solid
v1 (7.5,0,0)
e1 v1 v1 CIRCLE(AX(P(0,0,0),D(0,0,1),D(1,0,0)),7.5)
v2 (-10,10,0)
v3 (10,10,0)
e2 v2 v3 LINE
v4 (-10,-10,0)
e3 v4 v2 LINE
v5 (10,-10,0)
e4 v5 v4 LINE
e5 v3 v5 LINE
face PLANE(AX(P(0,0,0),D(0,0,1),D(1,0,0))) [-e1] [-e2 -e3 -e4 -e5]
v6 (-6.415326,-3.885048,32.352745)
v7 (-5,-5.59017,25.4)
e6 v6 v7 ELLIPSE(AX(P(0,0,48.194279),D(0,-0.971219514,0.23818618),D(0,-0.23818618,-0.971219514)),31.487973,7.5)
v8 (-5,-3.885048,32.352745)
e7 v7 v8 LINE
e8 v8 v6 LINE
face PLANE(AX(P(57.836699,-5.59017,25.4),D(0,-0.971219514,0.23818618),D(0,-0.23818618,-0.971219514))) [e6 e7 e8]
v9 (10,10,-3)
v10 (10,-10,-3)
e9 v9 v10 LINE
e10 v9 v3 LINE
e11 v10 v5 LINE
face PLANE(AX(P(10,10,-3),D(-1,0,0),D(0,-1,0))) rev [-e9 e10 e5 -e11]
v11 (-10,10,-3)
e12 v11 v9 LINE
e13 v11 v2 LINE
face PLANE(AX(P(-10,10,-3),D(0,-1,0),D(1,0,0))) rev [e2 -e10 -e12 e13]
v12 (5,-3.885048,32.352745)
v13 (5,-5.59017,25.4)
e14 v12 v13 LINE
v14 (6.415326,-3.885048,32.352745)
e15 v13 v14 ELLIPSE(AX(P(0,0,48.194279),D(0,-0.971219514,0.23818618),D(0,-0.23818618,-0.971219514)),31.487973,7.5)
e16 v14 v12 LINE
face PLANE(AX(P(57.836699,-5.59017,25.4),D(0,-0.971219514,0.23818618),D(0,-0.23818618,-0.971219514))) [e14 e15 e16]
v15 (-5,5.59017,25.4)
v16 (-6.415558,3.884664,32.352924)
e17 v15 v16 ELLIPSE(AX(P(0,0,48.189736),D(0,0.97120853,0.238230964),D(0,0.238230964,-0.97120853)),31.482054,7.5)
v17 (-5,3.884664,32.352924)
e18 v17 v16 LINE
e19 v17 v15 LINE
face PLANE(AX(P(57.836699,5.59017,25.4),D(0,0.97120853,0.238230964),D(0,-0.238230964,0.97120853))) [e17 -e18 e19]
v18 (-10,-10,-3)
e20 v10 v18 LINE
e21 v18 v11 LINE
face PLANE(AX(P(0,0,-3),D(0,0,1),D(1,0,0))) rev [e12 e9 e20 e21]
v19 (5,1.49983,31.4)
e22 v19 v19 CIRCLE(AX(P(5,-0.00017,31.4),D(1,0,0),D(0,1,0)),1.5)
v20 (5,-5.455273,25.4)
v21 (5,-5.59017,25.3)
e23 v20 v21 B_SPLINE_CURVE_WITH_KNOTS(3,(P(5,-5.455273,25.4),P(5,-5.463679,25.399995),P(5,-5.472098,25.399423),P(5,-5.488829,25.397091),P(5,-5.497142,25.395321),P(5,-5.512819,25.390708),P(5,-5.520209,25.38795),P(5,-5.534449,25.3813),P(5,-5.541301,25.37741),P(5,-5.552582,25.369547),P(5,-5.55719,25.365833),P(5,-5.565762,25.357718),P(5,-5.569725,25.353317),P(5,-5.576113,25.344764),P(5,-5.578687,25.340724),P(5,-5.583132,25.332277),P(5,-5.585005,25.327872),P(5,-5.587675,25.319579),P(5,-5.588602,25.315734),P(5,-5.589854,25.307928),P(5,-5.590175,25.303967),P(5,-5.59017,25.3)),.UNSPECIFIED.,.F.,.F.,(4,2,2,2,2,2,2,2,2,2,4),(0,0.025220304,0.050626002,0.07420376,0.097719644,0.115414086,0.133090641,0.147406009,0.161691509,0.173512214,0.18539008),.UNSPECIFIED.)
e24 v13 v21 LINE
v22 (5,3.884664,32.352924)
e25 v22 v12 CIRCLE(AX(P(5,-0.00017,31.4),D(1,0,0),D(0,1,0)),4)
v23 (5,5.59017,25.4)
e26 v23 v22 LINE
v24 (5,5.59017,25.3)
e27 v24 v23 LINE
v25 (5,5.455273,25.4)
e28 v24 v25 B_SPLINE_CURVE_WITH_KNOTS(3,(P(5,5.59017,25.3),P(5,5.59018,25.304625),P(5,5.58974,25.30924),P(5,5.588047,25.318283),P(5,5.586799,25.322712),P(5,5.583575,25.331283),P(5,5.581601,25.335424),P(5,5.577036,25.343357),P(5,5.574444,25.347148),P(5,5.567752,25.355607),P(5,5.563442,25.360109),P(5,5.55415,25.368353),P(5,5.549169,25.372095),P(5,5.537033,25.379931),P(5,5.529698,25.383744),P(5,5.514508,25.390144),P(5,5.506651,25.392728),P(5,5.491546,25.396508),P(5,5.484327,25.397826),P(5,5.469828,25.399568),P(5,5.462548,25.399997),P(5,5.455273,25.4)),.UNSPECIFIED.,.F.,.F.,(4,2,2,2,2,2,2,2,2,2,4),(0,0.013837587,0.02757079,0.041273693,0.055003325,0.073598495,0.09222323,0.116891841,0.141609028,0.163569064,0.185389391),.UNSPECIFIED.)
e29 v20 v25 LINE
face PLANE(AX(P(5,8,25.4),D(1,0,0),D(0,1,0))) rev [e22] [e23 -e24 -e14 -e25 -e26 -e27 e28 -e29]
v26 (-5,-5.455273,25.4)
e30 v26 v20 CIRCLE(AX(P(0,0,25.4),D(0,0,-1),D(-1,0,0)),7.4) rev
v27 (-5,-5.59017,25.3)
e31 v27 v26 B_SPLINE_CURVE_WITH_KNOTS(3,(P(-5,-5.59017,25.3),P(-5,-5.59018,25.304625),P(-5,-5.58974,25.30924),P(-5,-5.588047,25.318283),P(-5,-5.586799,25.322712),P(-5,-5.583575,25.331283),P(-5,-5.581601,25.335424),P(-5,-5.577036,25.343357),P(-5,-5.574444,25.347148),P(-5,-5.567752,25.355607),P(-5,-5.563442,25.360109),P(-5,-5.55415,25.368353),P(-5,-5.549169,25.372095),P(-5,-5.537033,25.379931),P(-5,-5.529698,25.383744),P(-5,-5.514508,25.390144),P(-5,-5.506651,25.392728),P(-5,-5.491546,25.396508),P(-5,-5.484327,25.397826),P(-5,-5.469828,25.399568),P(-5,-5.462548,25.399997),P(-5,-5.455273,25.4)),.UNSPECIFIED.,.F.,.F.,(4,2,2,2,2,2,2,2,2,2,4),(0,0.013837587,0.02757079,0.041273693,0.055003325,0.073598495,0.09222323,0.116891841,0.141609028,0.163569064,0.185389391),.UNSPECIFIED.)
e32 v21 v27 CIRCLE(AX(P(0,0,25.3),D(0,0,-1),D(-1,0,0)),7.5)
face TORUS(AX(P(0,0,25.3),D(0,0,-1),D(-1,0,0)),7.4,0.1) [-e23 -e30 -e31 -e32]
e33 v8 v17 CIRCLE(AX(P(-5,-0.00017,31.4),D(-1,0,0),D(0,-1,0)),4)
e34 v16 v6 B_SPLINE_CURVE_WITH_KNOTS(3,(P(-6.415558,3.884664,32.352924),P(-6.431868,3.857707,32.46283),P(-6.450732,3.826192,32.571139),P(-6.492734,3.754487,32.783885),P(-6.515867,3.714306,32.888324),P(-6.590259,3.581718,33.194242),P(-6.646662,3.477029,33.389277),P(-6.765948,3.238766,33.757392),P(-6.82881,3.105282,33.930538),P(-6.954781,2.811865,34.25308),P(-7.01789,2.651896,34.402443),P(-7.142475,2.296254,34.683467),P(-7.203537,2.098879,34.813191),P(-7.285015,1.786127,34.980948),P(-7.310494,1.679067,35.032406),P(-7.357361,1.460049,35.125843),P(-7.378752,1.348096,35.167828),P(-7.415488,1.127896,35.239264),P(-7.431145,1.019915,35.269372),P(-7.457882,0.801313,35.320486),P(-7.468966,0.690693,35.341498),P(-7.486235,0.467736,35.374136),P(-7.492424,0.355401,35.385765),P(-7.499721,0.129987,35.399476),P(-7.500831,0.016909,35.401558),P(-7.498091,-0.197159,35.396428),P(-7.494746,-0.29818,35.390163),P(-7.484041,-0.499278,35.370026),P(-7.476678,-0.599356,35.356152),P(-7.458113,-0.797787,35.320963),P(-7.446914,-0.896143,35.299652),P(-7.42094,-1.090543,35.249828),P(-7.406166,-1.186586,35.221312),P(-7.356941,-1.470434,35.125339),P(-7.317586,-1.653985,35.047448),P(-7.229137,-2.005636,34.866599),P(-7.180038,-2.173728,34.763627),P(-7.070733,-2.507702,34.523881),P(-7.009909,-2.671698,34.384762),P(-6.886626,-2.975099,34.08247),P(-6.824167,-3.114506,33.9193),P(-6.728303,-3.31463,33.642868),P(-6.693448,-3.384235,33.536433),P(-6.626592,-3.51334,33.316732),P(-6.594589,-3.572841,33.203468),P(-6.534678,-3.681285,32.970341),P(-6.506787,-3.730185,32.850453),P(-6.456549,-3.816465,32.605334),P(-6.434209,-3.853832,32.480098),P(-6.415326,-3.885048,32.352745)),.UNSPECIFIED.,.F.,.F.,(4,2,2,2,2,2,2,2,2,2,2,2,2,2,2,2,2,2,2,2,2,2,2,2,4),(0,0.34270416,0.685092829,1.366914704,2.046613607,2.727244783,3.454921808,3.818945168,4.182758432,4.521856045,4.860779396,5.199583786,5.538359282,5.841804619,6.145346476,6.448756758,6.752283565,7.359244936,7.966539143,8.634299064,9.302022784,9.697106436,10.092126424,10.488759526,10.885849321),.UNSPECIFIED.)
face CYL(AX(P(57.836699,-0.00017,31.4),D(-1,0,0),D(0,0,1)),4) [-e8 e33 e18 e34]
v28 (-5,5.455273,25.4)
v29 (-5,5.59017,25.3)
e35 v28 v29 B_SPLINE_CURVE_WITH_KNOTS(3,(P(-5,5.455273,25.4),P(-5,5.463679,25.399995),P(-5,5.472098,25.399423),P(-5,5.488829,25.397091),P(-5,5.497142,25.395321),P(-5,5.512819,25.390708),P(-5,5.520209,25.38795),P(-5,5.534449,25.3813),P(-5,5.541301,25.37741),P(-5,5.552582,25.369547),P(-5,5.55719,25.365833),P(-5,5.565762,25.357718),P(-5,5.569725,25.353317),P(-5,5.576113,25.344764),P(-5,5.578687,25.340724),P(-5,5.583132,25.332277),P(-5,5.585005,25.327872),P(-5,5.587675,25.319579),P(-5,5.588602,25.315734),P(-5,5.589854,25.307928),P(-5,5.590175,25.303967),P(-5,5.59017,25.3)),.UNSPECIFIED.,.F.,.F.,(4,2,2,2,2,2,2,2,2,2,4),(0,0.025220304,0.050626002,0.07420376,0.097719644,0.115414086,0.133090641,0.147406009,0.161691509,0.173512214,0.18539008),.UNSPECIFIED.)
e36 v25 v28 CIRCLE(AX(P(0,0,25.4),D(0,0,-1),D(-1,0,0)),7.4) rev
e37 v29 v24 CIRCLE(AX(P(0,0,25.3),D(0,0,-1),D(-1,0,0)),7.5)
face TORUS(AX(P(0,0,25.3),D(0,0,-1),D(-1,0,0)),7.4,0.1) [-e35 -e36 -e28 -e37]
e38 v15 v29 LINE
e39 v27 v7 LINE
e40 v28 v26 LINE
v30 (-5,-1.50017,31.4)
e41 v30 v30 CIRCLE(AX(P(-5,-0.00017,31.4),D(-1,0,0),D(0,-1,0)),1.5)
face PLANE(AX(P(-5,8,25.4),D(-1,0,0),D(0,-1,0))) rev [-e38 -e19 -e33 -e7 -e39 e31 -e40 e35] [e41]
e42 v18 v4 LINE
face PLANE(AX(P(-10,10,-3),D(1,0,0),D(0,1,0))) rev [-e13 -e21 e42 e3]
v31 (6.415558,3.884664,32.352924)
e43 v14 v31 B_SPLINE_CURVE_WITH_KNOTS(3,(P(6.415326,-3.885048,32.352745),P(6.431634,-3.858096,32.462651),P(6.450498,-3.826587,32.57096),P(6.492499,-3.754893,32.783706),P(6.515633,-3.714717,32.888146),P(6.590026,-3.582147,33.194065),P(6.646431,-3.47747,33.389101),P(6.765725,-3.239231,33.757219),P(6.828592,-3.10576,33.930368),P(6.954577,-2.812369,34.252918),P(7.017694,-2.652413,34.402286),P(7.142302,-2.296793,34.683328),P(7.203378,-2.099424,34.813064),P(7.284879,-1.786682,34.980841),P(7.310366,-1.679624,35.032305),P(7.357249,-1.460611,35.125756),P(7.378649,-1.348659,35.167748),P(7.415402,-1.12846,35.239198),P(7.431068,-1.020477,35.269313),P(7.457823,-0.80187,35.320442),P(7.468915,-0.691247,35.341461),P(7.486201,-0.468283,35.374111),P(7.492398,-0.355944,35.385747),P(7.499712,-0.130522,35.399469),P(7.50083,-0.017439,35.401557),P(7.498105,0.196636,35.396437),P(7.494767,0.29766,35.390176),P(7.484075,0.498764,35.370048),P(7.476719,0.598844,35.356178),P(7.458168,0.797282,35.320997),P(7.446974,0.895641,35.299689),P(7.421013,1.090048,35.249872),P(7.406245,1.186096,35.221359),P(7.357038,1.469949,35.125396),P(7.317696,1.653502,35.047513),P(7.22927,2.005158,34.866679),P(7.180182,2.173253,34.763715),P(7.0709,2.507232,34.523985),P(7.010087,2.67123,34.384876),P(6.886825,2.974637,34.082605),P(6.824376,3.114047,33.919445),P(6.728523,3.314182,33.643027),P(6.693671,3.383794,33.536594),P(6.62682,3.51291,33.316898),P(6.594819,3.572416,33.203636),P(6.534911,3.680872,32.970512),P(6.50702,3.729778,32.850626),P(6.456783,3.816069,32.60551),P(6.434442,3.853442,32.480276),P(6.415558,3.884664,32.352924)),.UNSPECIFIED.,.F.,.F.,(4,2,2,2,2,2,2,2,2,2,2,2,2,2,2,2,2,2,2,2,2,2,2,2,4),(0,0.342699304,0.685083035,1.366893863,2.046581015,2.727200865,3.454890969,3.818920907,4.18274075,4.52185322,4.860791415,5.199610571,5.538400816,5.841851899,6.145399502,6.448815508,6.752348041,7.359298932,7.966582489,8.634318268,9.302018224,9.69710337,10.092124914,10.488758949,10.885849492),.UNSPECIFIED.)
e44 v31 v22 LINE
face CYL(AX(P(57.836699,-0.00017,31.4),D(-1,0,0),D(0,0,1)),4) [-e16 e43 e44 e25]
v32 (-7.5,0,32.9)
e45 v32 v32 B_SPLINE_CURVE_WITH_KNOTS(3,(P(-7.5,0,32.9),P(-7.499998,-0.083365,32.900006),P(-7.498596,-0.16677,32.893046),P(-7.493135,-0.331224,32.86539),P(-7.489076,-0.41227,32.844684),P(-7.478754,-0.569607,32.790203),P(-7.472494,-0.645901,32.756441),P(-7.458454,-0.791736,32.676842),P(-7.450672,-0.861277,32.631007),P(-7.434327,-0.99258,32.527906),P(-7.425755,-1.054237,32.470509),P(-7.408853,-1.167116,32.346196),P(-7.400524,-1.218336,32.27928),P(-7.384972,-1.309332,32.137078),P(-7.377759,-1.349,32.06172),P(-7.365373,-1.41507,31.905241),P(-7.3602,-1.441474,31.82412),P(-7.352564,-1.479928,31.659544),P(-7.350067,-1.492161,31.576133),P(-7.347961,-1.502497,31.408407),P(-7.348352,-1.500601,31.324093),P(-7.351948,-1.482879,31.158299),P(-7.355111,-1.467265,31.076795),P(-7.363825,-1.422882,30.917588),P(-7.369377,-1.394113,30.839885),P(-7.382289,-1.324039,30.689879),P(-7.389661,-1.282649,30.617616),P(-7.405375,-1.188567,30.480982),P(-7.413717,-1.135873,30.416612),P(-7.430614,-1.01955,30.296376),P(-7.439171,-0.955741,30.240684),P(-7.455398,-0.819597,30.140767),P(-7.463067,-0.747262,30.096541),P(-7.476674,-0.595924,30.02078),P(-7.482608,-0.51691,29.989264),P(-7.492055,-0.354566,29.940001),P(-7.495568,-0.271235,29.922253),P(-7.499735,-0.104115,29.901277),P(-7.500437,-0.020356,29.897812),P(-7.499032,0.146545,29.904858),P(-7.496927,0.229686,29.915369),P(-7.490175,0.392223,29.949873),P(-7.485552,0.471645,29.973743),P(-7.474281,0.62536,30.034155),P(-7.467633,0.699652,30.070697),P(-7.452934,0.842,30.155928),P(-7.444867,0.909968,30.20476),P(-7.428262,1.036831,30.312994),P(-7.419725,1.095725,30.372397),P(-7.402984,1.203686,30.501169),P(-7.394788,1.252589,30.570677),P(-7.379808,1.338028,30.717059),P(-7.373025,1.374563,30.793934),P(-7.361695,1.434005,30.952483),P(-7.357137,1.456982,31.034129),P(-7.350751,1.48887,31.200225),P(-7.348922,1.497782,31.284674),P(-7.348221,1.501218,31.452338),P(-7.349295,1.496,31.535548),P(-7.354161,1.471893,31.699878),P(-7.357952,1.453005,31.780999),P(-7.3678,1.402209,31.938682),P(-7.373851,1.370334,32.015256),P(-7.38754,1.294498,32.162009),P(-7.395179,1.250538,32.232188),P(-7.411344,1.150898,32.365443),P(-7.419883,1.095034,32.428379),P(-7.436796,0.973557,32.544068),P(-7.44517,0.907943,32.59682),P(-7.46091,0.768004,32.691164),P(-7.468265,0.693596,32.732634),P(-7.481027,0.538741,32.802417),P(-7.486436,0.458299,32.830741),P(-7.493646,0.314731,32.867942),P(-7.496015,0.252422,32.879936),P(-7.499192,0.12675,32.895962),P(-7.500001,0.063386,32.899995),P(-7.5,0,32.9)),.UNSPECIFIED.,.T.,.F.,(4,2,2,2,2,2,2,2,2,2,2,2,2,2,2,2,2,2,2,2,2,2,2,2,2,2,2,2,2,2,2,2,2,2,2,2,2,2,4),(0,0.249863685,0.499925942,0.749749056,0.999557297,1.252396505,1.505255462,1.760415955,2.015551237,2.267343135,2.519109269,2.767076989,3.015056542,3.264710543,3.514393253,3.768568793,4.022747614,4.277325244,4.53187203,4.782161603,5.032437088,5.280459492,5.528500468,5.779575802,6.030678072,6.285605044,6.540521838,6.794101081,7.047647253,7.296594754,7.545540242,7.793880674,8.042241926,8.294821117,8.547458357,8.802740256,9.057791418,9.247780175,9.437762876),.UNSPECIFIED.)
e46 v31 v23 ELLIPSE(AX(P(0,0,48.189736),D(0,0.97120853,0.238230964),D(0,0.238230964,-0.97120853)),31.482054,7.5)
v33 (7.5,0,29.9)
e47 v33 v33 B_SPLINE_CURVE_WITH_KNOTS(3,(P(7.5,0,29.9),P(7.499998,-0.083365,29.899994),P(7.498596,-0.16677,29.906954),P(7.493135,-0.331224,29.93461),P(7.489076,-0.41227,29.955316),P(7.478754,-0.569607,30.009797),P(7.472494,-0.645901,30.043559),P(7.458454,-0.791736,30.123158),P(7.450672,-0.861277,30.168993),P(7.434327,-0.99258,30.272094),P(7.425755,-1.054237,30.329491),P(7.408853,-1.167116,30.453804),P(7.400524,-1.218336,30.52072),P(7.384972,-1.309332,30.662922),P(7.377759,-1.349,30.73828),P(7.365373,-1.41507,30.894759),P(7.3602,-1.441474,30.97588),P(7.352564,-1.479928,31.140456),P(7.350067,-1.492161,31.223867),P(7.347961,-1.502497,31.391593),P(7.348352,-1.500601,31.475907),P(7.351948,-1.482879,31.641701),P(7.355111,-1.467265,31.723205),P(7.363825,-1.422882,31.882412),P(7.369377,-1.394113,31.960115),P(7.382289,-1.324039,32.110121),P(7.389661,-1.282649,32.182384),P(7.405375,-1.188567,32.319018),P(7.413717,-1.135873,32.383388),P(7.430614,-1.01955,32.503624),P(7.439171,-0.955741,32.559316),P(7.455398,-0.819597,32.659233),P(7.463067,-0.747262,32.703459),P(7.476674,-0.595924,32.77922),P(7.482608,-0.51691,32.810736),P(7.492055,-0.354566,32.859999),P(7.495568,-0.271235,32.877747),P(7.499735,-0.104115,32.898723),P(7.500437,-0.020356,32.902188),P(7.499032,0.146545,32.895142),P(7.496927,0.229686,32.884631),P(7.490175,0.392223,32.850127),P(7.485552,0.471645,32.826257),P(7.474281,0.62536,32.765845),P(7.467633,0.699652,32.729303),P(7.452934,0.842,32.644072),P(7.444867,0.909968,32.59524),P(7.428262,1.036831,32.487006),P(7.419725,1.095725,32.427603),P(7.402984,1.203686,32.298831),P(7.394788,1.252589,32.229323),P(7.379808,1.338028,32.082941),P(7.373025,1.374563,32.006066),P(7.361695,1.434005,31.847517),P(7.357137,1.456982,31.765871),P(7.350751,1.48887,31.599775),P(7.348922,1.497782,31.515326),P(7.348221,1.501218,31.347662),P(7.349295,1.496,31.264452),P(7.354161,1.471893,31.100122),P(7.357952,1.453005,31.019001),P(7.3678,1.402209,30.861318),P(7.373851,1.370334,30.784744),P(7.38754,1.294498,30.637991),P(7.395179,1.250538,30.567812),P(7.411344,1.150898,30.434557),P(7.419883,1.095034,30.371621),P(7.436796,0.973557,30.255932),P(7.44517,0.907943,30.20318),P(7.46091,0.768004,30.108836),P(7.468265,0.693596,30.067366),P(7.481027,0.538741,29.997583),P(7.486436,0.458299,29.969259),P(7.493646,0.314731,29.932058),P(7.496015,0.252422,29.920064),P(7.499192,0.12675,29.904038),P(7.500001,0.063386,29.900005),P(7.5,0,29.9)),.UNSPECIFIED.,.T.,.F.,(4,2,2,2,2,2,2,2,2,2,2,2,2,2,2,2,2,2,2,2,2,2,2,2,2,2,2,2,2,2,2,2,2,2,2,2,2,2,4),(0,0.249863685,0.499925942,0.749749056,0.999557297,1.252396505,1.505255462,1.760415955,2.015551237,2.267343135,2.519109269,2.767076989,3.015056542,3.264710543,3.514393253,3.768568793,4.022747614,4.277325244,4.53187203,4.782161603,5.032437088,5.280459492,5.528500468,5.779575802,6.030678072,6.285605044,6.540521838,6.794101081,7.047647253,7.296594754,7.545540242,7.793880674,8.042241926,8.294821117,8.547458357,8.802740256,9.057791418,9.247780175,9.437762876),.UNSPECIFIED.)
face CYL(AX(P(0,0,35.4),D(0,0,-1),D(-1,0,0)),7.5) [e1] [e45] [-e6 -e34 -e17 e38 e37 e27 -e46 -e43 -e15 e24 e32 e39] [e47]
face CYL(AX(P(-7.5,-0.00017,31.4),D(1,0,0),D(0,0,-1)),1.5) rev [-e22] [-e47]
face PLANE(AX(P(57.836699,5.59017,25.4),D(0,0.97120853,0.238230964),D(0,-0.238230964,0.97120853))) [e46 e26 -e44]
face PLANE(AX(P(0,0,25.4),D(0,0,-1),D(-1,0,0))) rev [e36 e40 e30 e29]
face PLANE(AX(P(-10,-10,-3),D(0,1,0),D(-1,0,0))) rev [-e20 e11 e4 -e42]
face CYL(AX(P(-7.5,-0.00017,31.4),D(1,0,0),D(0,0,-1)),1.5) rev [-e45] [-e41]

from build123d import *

# Parameters (mm, degrees)
SKETCH1_R               = 7.5
BOSS_EXTRUDE1_DEPTH     = 35.4
SKETCH3_W               = 10
SKETCH3_H               = 16
CUT_EXTRUDE2_DEPTH      = 10
CUT_EXTRUDE3_DEPTH      = 37.954837302
CUT_EXTRUDE3_DEPTH_BACK = 37.954837302
CUT_EXTRUDE4_DEPTH      = 37.954837438
CUT_EXTRUDE4_DEPTH_BACK = 37.954837438
SKETCH5_R               = 1.5
FILLET1_R               = 0.1
SKETCH6_W               = 20
SKETCH6_H               = 20
BOSS_EXTRUDE2_DEPTH     = 3


with BuildPart() as part:
    # Sketch1 → Boss-Extrude1 (new body)
    with BuildSketch(Plane.XY):
        Circle(SKETCH1_R)
    extrude(amount=BOSS_EXTRUDE1_DEPTH)

    # Sketch3 → Cut-Extrude2 (cut)
    with BuildSketch(Plane.XY.offset(35.4)):
        Rectangle(SKETCH3_W, SKETCH3_H)
    extrude(amount=-CUT_EXTRUDE2_DEPTH, mode=Mode.SUBTRACT)

    # Sketch4 → Cut-Extrude3 (cut, two sides: drawn at the far end of the back side and taken through both)
    with BuildSketch(Plane(origin=(0, 0, 0), x_dir=(0, 0, -1), z_dir=(1, 0, 0)).offset(-CUT_EXTRUDE3_DEPTH_BACK)):
        with BuildLine():
            Line((-25.4, 76.496949074), (-25.4, 7.5))
            Line((-25.4, 7.5), (-25.4, 5.590169944))
            Line((-25.4, 5.590169944), (-32.352923855, 3.884664175))
            ThreePointArc((-32.352923855, 3.884664175), (-35.399999999, -0.000262165), (-32.352744721, -3.885047998))
            Line((-32.352744721, -3.885047998), (-25.4, -5.590169944))
            Line((-25.4, -5.590169944), (-25.4, -7.5))
            Line((-25.4, -7.5), (-25.4, -76.496949074))
            Line((-25.4, -76.496949074), (-163.393898147, -76.496949074))
            Line((-163.393898147, -76.496949074), (-163.393898147, 76.496949074))
            Line((-163.393898147, 76.496949074), (-25.4, 76.496949074))
        make_face()
    extrude(amount=CUT_EXTRUDE3_DEPTH + CUT_EXTRUDE3_DEPTH_BACK, mode=Mode.SUBTRACT)

    # Sketch5 → Cut-Extrude4 (cut, two sides: drawn at the far end of the back side and taken through both)
    with BuildSketch(Plane(origin=(0, 0, 0), x_dir=(0, 0, -1), z_dir=(1, 0, 0)).offset(-CUT_EXTRUDE4_DEPTH_BACK)):
        with Locations(Location((-31.4, -0.000169944, 0), (0, 0, 0.006491373))):
            Circle(SKETCH5_R)
    extrude(amount=CUT_EXTRUDE4_DEPTH + CUT_EXTRUDE4_DEPTH_BACK, mode=Mode.SUBTRACT)

    # Fillet1
    # the kernel refuses this fillet: 0.1 mm, written as the material it takes off along each edge
    with BuildSketch(Plane(origin=(0, 0, 25.4), x_dir=(0.6911452834399253, -0.7227158481580055, 0), z_dir=(0.7227158481580055, 0.6911452834399253, 0))) as fillet1_piece_1_section:
        with BuildLine():
            CenterArc((7.5 - FILLET1_R, FILLET1_R), FILLET1_R, 270, 90)
            Line((7.5 - FILLET1_R, 0), (7.5, 0))
            Line((7.5, 0), (7.5, FILLET1_R))
        make_face()
    fillet1_piece_1 = revolve(axis=Axis((0, 0, 25.4), (0, 0, -1)), revolution_arc=87.441672972, mode=Mode.PRIVATE)
    fillet1_piece_1 = split(fillet1_piece_1, bisect_by=Plane(origin=(5, -5.569278589, 25.383070115), z_dir=(-1, 0, 0)), keep=Keep.TOP, mode=Mode.PRIVATE)
    fillet1_piece_1 = split(fillet1_piece_1, bisect_by=Plane(origin=(-5, -5.569278589, 25.383070115), z_dir=(1, 0, 0)), keep=Keep.TOP, mode=Mode.PRIVATE)
    add(fillet1_piece_1, mode=Mode.SUBTRACT)
    with BuildSketch(Plane(origin=(0, 0, 25.4), x_dir=(-0.6911452834399255, 0.7227158481580054, 0), z_dir=(-0.7227158481580054, -0.6911452834399255, 0))) as fillet1_piece_2_section:
        with BuildLine():
            CenterArc((7.5 - FILLET1_R, FILLET1_R), FILLET1_R, 270, 90)
            Line((7.5 - FILLET1_R, 0), (7.5, 0))
            Line((7.5, 0), (7.5, FILLET1_R))
        make_face()
    fillet1_piece_2 = revolve(axis=Axis((0, 0, 25.4), (0, 0, -1)), revolution_arc=87.441672972, mode=Mode.PRIVATE)
    fillet1_piece_2 = split(fillet1_piece_2, bisect_by=Plane(origin=(5, 5.569279486, 25.383069507), z_dir=(-1, 0, 0)), keep=Keep.TOP, mode=Mode.PRIVATE)
    fillet1_piece_2 = split(fillet1_piece_2, bisect_by=Plane(origin=(-5, 5.569279486, 25.383069507), z_dir=(1, 0, 0)), keep=Keep.TOP, mode=Mode.PRIVATE)
    add(fillet1_piece_2, mode=Mode.SUBTRACT)

    # Sketch6 → Boss-Extrude2 (add)
    with BuildSketch(Plane(origin=(0, 0, 0), x_dir=(-1, 0, 0), z_dir=(0, 0, -1))):
        Rectangle(SKETCH6_W, SKETCH6_H)
    extrude(amount=BOSS_EXTRUDE2_DEPTH)


solid = part.part
